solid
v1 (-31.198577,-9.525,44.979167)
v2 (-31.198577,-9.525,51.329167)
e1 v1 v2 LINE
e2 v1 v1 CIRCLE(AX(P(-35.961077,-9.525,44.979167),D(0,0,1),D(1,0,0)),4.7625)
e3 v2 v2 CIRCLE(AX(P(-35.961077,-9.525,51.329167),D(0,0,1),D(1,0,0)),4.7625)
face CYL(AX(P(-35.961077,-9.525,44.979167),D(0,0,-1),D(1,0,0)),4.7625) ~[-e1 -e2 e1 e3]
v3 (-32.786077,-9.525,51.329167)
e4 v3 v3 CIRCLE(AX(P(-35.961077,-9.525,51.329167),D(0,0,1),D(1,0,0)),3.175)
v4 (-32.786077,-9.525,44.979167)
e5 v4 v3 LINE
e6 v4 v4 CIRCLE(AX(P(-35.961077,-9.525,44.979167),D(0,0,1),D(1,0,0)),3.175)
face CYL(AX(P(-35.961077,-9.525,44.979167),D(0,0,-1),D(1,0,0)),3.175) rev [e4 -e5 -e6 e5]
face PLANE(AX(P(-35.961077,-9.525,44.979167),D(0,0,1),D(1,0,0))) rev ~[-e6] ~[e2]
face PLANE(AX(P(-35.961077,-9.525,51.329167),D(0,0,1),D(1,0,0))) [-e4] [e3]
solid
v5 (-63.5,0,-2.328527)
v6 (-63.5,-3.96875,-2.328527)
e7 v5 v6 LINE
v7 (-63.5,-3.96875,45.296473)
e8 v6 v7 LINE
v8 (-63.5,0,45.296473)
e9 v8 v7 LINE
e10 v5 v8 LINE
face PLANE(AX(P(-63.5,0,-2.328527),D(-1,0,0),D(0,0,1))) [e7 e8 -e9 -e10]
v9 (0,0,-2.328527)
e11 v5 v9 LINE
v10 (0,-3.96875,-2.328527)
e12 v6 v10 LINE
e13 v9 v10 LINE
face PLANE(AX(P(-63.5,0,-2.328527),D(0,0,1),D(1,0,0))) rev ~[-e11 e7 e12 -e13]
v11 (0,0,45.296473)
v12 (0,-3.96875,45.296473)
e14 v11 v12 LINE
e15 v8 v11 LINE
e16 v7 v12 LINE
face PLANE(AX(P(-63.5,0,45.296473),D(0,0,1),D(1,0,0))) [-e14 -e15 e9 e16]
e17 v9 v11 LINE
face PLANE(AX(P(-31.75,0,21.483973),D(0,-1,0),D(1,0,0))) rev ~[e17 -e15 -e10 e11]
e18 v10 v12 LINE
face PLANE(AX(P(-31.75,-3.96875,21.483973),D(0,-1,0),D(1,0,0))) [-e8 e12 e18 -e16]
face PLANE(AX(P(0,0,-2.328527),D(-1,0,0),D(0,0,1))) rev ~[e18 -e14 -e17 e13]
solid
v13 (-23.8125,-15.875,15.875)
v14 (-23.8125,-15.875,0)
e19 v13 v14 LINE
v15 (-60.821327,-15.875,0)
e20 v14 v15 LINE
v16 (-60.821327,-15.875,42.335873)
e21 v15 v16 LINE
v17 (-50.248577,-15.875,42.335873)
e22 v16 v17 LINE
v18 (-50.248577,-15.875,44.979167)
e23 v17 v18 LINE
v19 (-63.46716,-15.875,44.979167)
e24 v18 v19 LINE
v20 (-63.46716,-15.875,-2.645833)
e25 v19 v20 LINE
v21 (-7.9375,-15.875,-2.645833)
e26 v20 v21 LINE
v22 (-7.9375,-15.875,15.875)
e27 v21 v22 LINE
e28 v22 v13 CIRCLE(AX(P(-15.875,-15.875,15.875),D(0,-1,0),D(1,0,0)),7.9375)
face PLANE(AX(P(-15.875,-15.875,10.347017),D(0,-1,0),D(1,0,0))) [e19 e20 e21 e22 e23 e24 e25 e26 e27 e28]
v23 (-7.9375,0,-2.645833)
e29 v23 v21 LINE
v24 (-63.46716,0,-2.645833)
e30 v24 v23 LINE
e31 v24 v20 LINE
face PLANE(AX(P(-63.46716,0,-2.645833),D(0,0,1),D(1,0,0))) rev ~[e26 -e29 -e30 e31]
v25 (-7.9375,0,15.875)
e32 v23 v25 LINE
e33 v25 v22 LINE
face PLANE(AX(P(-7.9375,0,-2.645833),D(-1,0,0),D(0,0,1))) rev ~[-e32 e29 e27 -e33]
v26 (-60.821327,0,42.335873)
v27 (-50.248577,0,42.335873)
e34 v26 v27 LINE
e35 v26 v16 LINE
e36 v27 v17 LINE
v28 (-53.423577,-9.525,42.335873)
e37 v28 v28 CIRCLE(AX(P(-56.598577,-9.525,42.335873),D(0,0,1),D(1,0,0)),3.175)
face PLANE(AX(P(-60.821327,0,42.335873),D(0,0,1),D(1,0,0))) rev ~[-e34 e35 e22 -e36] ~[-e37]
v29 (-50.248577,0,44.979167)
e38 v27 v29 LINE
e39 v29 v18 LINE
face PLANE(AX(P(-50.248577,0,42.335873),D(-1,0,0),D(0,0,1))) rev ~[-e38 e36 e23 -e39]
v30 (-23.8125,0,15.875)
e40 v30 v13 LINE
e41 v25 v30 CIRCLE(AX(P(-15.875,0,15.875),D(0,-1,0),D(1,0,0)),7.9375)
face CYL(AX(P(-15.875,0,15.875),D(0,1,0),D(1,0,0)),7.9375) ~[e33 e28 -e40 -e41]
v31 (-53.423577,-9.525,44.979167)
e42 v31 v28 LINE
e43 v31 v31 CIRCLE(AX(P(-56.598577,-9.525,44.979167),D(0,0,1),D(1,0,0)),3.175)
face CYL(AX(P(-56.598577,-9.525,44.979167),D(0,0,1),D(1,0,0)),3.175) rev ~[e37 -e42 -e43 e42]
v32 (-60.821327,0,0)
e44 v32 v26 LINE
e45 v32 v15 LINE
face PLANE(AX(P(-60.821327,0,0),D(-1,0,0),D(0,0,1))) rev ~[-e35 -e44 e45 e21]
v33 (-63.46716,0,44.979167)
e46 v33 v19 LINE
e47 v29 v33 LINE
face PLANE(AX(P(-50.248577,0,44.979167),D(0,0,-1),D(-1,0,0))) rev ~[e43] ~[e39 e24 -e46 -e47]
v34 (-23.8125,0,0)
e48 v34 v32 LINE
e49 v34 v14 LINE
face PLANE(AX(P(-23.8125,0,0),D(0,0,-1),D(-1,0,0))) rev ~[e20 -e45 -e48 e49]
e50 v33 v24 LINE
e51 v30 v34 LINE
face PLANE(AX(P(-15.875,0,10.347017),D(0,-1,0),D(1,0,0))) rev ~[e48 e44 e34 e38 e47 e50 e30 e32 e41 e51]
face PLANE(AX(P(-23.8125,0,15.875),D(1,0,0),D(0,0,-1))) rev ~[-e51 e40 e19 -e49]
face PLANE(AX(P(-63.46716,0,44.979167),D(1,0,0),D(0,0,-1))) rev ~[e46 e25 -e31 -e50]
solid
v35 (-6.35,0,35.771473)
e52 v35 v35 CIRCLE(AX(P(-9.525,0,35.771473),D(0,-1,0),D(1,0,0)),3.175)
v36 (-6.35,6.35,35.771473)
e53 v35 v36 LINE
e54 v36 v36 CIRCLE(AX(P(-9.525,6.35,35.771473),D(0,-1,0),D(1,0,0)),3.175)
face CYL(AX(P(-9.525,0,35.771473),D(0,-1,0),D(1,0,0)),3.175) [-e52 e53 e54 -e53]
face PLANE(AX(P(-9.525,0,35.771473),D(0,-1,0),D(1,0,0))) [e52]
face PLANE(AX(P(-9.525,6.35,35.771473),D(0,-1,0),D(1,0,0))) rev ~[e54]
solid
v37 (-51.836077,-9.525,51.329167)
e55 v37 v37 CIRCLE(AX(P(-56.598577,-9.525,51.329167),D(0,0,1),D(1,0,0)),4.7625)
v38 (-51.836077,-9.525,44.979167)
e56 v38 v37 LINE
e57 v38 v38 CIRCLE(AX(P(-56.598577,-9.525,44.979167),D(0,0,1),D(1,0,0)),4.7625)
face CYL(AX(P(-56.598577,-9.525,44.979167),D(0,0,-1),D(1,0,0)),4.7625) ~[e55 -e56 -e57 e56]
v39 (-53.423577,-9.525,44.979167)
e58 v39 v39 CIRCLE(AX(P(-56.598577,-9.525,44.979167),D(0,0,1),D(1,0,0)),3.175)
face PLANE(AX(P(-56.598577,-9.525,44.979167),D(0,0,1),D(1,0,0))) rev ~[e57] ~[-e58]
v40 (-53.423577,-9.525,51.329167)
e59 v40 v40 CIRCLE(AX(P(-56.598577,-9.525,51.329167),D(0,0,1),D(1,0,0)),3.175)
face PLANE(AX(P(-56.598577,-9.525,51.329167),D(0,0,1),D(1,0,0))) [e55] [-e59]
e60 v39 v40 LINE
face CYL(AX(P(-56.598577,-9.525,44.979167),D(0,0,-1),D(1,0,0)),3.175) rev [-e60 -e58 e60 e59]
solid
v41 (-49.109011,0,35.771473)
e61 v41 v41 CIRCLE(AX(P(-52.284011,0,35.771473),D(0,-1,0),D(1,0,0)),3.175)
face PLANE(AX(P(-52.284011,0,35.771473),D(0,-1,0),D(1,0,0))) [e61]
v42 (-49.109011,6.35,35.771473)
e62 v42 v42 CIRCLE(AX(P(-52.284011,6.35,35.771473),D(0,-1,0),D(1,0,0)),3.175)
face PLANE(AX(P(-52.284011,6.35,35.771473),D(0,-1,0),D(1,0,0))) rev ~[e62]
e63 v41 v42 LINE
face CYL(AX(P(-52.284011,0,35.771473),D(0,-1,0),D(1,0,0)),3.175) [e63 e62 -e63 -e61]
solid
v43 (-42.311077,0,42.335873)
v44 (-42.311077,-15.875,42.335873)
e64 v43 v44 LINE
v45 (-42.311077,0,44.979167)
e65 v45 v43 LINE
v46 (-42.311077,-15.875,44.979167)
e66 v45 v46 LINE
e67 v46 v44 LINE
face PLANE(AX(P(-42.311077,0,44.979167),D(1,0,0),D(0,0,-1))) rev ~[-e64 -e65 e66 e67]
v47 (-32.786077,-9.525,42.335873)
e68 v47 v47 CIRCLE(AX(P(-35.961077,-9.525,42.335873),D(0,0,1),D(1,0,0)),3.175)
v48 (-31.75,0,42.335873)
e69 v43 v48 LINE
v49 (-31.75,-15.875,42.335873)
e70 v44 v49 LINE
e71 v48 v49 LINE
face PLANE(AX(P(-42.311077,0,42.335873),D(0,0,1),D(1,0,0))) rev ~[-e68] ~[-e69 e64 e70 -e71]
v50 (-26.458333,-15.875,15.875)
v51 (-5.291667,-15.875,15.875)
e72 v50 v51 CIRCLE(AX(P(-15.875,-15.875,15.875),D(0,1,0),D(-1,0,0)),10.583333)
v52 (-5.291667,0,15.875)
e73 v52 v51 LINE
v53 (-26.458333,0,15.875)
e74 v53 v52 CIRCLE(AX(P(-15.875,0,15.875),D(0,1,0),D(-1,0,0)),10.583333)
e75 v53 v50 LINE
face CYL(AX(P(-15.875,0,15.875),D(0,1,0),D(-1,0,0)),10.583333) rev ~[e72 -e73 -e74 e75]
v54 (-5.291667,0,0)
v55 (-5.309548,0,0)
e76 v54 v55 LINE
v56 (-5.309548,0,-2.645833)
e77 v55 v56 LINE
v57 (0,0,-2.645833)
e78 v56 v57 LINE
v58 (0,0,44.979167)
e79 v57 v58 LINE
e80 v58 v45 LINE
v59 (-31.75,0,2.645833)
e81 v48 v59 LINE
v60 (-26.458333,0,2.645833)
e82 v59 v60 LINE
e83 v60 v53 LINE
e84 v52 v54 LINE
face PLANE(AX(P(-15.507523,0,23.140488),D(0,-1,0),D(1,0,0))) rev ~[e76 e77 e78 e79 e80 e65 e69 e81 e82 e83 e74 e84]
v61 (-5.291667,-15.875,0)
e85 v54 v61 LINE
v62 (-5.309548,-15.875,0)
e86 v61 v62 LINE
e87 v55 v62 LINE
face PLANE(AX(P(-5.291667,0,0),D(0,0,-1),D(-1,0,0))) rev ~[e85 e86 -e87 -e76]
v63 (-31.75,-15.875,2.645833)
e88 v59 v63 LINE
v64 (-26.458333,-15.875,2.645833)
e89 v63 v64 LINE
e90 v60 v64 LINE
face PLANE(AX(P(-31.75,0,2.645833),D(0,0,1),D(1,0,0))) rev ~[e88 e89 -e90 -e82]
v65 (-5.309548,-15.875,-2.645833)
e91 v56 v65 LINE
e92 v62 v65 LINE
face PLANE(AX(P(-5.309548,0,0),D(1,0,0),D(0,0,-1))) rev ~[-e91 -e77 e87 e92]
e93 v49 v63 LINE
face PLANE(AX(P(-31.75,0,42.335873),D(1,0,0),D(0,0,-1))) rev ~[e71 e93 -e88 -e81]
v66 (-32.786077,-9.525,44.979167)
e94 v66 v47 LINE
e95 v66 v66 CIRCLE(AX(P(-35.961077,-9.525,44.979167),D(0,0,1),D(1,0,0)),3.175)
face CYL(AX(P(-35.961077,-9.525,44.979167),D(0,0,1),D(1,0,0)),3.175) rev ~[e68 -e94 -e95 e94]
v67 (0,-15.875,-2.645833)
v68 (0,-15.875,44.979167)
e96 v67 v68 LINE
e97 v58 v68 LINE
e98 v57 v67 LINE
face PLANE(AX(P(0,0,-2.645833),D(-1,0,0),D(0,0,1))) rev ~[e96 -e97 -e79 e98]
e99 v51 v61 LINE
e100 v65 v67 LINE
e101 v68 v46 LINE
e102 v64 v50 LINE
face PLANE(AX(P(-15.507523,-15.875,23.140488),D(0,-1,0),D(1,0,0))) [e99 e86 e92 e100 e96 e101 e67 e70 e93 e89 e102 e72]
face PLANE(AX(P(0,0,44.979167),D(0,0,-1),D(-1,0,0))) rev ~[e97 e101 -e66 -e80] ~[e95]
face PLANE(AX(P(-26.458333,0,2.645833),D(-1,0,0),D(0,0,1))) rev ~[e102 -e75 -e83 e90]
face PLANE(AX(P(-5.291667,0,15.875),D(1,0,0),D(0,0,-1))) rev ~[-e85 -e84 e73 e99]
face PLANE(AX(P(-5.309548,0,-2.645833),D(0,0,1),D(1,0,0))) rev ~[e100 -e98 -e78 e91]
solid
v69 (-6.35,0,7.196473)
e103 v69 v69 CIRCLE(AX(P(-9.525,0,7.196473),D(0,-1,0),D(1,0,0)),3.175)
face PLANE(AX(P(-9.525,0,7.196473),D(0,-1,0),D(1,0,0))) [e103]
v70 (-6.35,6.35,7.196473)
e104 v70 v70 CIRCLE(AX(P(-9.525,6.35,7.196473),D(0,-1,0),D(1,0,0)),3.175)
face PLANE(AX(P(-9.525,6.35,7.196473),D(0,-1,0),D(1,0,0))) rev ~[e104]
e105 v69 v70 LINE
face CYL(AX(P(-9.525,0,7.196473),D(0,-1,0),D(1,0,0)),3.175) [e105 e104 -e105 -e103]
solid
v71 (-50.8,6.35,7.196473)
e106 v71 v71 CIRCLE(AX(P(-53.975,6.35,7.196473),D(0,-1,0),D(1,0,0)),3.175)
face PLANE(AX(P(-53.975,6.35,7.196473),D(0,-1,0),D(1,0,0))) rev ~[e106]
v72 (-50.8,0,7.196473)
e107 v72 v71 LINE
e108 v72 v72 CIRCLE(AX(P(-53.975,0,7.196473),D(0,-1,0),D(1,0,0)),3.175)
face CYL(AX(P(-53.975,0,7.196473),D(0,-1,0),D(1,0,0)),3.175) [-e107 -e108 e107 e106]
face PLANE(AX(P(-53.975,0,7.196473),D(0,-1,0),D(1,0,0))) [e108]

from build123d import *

# Parameters (mm, degrees)
F1_DEPTH = 15.875
F0_W     = 2.6458333332
F0_H     = 42.3358732487
F2_W     = 63.5
F2_H     = 47.625
F2_R     = 3.175
F3_DEPTH = 3.96875
F4_DEPTH = 6.35
F5_R     = 4.7625
F5_R_2   = 3.175
F6_DEPTH = 6.35
F7_R     = 3.175
F8_DEPTH = 25.4


# Not quite as in the source:
# - a feature names something its author has since deleted; it is built from what else it names


with BuildPart() as f1:
    # F0 (on Front) → F1 (new body)
    with BuildSketch(Plane.XZ):
        with BuildLine():
            Line((0, 44.979166582), (-31.75, 44.979166582))
            Line((-31.75, 44.979166582), (-31.75, 42.3358732487))
            Line((-31.75, 42.3358732487), (-31.75, 2.6458333332))
            Line((-31.75, 2.6458333332), (-26.4583333333, 2.6458333332))
            Line((-26.4583333333, 2.6458333332), (-26.4583333333, 15.875))
            ThreePointArc((-26.4583333333, 15.875), (-15.875, 26.4583333333), (-5.2916666667, 15.875))
            Line((-5.2916666667, 15.875), (-5.2916666667, 0))
            Line((-5.2916666667, 0), (0, 0))
            Line((0, 0), (0, 44.979166582))
        make_face()
        Polygon((0, -2.6458333333), (0, 0), (-5.2916666667, 0), (-5.309548229, 0), (-5.309548229, -2.6458333333), align=None)
        Polygon((-31.75, 42.3358732487), (-31.75, 44.979166582), (-34.3958333316, 44.979166582), (-37.0416664956, 44.979166582), (-42.3110765377, 44.979166582), (-42.3110765377, 42.3358732487), (-37.0416664956, 42.3358732487), (-34.3958333316, 42.3358732487), align=None)
    extrude(amount=F1_DEPTH)


with BuildPart() as f1b:
    # F0 (on Front) → F1, piece 2 (new body)
    with BuildSketch(Plane.XZ):
        with BuildLine():
            Line((-23.8125, 0), (-7.9375, 0))
            Line((-7.9375, 0), (-7.9375, 15.875))
            ThreePointArc((-7.9375, 15.875), (-15.875, 23.8125), (-23.8125, 15.875))
            Line((-23.8125, 15.875), (-23.8125, 0))
        make_face()
        Polygon((-26.4583333333, 0), (-31.75, 0), (-60.8213265341, 0), (-63.4671598673, 0), (-63.4671598673, -2.6458333333), (-7.9375, -2.6458333333), (-7.9375, 0), (-23.8125, 0), align=None)
        with Locations((-62.1442432007, 21.1679366243)):
            Rectangle(F0_W, F0_H)
        Polygon((-50.2485765377, 42.3358732487), (-50.2485765377, 44.979166582), (-55.5296598693, 44.979166582), (-58.175493201, 44.979166582), (-63.4671598673, 44.979166582), (-63.4671598673, 42.3358732487), (-60.8213265341, 42.3358732487), (-58.175493201, 42.3358732487), (-55.5296598693, 42.3358732487), align=None)
    extrude(amount=F1_DEPTH)


with BuildPart() as f3:
    # F2 (on Front) → F3 (new body)
    with BuildSketch(Plane.XZ):
        with Locations((-31.75, 21.4839725468)):
            Rectangle(F2_W, F2_H)
        with Locations((-53.975, 7.1964725468)):
            Circle(F2_R, mode=Mode.SUBTRACT)
        with Locations((-9.525, 7.1964725468)):
            Circle(F2_R, mode=Mode.SUBTRACT)
        with Locations((-52.284011212, 35.7714725468)):
            Circle(F2_R, mode=Mode.SUBTRACT)
        with Locations((-9.525, 35.7714725468)):
            Circle(F2_R, mode=Mode.SUBTRACT)
        with Locations((-52.284011212, 35.7714725468)):
            Circle(F2_R)
        with Locations((-53.975, 7.1964725468)):
            Circle(F2_R)
        with Locations((-9.525, 7.1964725468)):
            Circle(F2_R)
        with Locations((-9.525, 35.7714725468)):
            Circle(F2_R)
    extrude(amount=F3_DEPTH)


with BuildPart() as f4:
    # F2 (on Front) → F4 (new body)
    with BuildSketch(Plane.XZ):
        with Locations((-9.525, 35.7714725468)):
            Circle(F2_R)
    extrude(amount=-F4_DEPTH)


with BuildPart() as f4b:
    # F2 (on Front) → F4, piece 2 (new body)
    with BuildSketch(Plane.XZ):
        with Locations((-52.284011212, 35.7714725468)):
            Circle(F2_R)
    extrude(amount=-F4_DEPTH)


with BuildPart() as f4c:
    # F2 (on Front) → F4, piece 3 (new body)
    with BuildSketch(Plane.XZ):
        with Locations((-9.525, 7.1964725468)):
            Circle(F2_R)
    extrude(amount=-F4_DEPTH)


with BuildPart() as f4d:
    # F2 (on Front) → F4, piece 4 (new body)
    with BuildSketch(Plane.XZ):
        with Locations((-53.975, 7.1964725468)):
            Circle(F2_R)
    extrude(amount=-F4_DEPTH)


with BuildPart() as f6:
    # F5 (on face) → F6 (new body)
    with BuildSketch(Plane.XY.offset(44.979166582)):
        with Locations((-56.5985765377, -9.525)):
            Circle(F5_R)
        with Locations((-56.5985765377, -9.525)):
            Circle(F5_R_2, mode=Mode.SUBTRACT)
    extrude(amount=F6_DEPTH)


with BuildPart() as f6b:
    # F5 (on face) → F6, piece 2 (new body)
    with BuildSketch(Plane.XY.offset(44.979166582)):
        with Locations((-35.9610765377, -9.525)):
            Circle(F5_R)
        with Locations((-35.9610765377, -9.525)):
            Circle(F5_R_2, mode=Mode.SUBTRACT)
    extrude(amount=F6_DEPTH)


with BuildPart() as f8_tool:
    # F7 (on face) → F8 (new body)
    with BuildSketch(Plane.XY.offset(44.979166582)):
        with Locations((-35.9610765377, -9.525)):
            Circle(F7_R)
        with Locations((-56.5985765377, -9.525)):
            Circle(F7_R)
    extrude(amount=-F8_DEPTH)


with BuildPart() as f1_1:
    add(f1.part)

    # F8: cut by f8_tool
    add(f8_tool.part, mode=Mode.SUBTRACT)


with BuildPart() as f1b_1:
    add(f1b.part)

    # F8: cut by f8_tool
    add(f8_tool.part, mode=Mode.SUBTRACT)


solid = Compound([f3.part, f4.part, f4b.part, f4c.part, f4d.part, f6.part, f6b.part, f1_1.part, f1b_1.part])
